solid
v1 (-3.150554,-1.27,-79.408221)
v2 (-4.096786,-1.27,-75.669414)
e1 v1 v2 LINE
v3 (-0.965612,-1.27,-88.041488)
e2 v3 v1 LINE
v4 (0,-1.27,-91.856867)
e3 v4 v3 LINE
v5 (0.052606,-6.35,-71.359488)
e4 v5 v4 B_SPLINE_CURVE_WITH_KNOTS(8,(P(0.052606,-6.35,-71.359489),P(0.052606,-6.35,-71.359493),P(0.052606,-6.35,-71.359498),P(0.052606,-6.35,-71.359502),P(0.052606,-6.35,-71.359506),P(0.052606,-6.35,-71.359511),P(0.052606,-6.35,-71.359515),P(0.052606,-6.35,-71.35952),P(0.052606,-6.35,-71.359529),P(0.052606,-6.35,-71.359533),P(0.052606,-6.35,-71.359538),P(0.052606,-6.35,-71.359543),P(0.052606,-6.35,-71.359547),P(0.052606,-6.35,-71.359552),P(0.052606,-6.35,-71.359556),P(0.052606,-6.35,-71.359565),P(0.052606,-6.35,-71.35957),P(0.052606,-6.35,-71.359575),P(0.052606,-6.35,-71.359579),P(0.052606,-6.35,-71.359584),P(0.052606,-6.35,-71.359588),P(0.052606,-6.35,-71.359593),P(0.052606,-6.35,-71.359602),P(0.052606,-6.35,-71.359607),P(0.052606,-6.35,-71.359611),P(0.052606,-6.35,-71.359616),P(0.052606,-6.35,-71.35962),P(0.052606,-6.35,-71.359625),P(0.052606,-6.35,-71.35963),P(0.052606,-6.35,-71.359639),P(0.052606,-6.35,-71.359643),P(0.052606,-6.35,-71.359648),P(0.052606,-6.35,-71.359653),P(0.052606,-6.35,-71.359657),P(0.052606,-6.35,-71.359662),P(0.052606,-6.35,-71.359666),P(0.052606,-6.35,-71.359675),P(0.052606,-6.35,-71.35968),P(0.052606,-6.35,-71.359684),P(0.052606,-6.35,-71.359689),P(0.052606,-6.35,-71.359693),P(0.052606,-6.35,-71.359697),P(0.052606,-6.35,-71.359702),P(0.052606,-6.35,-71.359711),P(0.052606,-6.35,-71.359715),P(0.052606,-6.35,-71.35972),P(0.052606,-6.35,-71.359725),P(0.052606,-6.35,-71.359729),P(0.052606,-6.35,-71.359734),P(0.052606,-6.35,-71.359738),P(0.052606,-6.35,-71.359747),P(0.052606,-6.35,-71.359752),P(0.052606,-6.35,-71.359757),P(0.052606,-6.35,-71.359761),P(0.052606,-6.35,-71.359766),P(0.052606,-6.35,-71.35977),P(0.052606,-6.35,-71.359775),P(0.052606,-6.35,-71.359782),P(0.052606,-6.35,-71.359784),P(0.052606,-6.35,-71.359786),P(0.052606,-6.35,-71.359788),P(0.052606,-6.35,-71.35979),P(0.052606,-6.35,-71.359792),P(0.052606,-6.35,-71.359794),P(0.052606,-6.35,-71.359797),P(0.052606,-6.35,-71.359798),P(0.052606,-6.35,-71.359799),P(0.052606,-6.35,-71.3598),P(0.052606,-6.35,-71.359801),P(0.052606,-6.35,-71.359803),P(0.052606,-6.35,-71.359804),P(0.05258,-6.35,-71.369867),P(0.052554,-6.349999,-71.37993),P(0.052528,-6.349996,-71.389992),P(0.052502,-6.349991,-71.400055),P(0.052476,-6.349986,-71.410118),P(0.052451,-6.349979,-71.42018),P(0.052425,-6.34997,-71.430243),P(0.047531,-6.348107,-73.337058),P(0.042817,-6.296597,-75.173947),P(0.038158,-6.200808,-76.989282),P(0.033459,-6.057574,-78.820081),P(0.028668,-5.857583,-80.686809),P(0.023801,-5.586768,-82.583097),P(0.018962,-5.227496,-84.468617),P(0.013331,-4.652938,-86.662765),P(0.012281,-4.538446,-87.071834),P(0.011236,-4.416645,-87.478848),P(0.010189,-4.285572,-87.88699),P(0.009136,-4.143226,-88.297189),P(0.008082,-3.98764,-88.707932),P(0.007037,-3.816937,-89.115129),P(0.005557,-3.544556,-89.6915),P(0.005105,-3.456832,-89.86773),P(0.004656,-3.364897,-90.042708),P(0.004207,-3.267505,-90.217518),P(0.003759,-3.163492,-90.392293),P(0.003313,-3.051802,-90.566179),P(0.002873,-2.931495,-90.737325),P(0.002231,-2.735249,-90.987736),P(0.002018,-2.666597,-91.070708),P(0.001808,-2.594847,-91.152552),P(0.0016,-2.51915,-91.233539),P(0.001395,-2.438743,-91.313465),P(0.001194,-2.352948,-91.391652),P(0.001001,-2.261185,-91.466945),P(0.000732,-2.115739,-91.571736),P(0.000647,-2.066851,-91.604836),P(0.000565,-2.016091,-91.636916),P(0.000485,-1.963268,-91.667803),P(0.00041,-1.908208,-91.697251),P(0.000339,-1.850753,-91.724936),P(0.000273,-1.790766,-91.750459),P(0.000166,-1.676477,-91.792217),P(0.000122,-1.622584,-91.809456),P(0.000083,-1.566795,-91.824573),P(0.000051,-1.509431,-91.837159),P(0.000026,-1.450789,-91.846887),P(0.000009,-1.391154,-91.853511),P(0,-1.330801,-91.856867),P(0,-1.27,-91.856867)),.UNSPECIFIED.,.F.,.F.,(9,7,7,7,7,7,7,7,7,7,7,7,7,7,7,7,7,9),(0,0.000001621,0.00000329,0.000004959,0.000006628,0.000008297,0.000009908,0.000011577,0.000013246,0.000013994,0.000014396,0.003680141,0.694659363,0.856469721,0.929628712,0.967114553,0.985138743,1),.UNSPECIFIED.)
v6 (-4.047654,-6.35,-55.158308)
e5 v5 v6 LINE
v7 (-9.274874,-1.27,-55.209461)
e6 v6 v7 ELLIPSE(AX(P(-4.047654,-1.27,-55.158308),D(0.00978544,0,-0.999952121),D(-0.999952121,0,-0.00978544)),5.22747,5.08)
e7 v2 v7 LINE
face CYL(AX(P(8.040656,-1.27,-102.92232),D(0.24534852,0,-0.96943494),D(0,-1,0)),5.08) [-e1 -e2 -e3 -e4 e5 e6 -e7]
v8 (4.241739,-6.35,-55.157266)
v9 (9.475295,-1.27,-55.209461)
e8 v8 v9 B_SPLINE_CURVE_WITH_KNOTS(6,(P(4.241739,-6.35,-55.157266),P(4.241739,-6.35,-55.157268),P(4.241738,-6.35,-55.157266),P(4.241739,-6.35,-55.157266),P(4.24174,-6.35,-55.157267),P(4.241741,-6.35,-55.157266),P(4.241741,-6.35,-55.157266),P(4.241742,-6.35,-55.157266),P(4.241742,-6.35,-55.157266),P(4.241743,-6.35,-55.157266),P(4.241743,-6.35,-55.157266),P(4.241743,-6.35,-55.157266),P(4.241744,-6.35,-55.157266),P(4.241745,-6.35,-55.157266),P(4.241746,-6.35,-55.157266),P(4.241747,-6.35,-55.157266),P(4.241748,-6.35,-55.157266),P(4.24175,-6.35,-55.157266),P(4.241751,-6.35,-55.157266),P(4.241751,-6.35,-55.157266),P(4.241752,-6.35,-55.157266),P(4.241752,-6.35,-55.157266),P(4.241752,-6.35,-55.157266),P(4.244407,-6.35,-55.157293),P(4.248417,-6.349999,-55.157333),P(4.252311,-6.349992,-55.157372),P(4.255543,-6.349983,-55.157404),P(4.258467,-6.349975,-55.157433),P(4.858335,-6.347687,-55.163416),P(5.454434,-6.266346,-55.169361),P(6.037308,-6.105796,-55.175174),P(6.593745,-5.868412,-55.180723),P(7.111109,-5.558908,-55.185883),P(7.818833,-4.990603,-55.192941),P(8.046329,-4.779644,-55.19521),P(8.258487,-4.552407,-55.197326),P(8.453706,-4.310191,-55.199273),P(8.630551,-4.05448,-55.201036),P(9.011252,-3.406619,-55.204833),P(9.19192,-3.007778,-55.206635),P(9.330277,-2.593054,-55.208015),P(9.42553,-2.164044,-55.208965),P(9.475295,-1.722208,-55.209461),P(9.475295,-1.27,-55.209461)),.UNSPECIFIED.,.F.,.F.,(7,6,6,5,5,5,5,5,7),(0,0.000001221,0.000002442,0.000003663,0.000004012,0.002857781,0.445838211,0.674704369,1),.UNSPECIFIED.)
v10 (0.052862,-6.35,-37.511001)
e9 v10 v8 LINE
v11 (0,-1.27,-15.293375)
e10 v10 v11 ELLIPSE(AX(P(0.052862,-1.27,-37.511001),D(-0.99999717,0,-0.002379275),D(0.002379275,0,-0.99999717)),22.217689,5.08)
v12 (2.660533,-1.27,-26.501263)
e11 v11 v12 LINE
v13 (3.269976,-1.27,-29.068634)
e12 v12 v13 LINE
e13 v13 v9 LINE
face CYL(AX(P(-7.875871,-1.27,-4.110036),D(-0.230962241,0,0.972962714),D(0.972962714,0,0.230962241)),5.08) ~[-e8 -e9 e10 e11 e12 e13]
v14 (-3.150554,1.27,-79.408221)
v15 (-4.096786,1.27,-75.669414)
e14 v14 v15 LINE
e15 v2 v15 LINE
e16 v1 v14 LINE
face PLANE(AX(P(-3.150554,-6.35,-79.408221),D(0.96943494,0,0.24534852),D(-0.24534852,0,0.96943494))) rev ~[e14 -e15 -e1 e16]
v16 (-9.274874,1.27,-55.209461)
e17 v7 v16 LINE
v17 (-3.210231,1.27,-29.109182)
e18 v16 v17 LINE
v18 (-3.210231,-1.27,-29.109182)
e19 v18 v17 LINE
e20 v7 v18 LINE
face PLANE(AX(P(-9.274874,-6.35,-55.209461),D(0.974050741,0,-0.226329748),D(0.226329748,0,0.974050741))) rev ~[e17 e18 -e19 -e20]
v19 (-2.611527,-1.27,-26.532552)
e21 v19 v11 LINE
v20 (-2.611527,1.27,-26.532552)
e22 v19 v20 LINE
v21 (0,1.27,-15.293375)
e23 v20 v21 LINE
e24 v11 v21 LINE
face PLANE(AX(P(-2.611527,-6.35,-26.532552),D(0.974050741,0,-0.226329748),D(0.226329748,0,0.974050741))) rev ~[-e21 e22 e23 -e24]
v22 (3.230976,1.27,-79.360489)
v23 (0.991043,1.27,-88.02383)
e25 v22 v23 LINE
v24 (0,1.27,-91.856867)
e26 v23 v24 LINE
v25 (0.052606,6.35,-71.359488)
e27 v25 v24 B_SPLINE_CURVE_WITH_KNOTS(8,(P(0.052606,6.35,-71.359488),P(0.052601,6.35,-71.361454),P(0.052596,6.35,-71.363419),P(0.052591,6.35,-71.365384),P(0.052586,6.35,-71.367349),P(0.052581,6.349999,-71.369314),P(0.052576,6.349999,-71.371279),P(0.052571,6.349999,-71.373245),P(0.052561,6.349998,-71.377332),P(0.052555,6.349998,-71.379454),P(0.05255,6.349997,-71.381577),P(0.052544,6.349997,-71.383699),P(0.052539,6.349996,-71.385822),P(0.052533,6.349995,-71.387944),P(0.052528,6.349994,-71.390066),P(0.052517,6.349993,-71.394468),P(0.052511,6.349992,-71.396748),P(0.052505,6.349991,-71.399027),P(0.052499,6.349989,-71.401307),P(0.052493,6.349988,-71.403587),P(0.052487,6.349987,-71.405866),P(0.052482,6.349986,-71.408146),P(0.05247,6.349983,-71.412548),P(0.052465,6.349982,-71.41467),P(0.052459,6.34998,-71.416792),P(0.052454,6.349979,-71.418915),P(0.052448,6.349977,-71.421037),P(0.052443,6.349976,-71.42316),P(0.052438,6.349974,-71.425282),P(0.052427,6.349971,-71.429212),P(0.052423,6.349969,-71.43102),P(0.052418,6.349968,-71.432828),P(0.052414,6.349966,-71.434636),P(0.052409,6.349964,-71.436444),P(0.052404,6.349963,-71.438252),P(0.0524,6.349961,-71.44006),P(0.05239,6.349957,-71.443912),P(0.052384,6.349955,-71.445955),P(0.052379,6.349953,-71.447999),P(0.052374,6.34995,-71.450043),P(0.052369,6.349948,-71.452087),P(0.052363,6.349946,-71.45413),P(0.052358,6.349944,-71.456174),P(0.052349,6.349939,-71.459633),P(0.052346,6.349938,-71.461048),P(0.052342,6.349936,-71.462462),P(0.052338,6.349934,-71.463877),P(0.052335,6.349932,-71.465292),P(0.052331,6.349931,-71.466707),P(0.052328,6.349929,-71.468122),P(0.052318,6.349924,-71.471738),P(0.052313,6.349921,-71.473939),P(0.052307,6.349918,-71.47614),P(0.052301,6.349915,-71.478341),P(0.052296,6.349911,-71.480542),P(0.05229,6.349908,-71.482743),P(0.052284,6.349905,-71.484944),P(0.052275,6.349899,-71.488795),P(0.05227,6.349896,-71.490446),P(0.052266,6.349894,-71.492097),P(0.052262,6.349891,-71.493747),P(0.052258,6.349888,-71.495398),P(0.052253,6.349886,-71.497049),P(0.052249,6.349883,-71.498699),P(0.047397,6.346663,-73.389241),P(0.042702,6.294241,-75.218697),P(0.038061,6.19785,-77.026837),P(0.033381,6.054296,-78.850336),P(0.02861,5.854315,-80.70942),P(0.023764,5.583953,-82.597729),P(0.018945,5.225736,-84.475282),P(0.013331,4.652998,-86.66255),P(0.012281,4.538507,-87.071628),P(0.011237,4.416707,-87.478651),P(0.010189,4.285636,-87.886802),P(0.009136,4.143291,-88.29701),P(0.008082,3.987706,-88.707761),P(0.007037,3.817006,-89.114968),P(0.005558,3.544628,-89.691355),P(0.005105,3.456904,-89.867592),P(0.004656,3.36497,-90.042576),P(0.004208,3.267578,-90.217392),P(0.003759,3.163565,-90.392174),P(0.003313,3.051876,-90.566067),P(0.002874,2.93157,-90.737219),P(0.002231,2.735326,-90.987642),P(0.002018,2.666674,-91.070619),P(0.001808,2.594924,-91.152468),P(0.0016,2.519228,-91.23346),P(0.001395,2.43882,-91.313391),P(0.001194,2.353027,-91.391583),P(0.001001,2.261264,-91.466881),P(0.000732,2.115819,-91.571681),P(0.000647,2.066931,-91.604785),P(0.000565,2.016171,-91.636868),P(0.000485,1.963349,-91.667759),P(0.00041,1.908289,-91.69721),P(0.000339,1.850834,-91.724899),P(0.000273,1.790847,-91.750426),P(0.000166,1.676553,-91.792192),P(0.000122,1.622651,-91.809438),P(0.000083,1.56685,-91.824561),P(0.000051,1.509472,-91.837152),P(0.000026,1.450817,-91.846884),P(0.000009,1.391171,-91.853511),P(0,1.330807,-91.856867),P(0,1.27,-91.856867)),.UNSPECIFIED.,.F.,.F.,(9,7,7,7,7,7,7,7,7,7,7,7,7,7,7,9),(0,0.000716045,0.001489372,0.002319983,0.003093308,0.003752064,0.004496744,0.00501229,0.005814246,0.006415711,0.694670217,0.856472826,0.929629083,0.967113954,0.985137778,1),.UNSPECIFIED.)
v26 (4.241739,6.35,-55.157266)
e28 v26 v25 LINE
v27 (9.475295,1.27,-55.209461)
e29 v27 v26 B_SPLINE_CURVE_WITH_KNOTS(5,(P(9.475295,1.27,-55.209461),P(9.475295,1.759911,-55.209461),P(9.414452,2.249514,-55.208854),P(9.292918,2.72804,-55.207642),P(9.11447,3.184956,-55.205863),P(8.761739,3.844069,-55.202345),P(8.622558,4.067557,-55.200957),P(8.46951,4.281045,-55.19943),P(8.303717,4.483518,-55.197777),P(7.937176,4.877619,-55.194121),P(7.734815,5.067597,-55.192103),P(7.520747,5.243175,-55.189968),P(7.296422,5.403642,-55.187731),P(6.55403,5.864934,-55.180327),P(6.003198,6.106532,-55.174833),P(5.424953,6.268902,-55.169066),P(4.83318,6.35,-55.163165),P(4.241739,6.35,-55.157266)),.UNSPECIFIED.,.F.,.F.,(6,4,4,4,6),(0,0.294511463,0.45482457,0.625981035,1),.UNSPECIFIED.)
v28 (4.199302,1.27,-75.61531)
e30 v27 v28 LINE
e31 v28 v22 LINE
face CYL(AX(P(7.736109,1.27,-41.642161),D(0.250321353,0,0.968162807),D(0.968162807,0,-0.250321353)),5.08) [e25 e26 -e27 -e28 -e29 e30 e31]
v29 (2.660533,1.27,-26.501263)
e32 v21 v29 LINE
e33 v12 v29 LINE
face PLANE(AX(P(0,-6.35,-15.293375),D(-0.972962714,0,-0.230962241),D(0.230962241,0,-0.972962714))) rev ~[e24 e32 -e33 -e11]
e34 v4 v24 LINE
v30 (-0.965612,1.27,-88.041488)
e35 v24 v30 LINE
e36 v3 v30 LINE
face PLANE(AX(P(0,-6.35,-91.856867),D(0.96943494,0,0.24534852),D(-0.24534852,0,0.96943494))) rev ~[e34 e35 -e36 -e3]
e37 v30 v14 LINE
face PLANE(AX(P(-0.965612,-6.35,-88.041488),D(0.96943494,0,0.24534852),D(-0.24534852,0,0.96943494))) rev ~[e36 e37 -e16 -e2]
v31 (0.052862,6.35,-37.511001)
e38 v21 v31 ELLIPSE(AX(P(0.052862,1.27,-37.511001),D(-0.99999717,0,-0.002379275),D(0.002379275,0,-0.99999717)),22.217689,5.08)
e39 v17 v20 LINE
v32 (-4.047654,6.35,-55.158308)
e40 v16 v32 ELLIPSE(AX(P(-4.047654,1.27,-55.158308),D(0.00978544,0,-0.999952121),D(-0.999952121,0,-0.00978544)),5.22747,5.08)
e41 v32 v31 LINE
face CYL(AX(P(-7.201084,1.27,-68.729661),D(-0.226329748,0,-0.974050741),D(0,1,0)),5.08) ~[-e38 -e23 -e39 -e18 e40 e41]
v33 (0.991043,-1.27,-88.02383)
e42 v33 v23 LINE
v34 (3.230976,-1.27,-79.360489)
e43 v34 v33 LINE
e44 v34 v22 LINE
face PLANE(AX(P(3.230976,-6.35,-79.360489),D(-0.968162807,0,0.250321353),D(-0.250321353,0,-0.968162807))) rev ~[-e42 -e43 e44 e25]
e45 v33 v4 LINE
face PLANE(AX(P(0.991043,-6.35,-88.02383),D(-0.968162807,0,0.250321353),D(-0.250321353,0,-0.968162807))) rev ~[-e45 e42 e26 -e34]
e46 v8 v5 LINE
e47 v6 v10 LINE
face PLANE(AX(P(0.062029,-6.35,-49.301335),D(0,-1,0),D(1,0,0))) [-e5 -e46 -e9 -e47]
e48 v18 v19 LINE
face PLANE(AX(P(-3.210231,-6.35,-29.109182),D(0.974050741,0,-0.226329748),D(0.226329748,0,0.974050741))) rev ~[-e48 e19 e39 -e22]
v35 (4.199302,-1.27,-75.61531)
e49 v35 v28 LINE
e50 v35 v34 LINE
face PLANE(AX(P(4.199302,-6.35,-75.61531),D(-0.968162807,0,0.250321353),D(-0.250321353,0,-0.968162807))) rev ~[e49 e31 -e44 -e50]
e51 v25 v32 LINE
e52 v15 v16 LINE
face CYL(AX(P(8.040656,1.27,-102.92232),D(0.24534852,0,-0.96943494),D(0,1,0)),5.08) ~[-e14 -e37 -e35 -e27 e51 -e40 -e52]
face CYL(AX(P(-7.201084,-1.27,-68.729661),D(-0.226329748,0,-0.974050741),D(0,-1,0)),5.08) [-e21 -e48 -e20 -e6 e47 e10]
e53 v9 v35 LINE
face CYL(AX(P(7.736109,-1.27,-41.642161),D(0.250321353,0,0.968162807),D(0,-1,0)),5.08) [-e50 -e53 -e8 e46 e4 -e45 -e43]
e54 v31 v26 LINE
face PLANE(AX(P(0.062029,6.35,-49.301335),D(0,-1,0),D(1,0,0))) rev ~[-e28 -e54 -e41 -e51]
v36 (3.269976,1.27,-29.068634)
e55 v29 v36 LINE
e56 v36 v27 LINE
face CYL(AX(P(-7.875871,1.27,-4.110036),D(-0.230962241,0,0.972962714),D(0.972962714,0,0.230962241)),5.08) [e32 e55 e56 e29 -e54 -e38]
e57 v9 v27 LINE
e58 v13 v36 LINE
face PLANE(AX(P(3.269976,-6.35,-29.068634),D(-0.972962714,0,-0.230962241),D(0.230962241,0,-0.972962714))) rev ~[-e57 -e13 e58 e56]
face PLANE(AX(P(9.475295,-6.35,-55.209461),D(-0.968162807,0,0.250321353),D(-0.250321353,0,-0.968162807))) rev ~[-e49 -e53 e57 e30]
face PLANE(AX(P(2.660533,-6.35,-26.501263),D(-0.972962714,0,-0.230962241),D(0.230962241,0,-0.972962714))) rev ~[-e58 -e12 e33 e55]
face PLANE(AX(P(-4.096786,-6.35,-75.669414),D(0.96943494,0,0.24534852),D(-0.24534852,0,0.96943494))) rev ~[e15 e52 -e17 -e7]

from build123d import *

# Parameters (mm, degrees)
F1_DEPTH    = 6.35
F2_DEPTH    = 6.35
F4_DEPTH    = 25.4
F5_T1_DEPTH = 66.3794734437
F5_T3_DEPTH = 66.4252991911
F5_T5_DEPTH = 63.2525240866
F5_T7_DEPTH = 63.2028524021


# Not quite as in the source:
# - a fillet or chamfer that OpenCascade refuses, or shapes differently, is made with other operations: its cross-section is extruded or revolved along the edge and cut away or added


with BuildPart() as f1:
    # F0 (on Front) → F1 (new body)
    with BuildSketch(Plane.XZ):
        Polygon((10.5009634349, -8.6313571018), (0, -8.4001217037), (-10.5245159939, -8.168367669), (-8.3013391122, -91.856867075), (8.6683045514, -91.856867075), align=None)
    extrude(amount=F1_DEPTH)

    # F2 (add): a face of the model
    f2_faces = [f1.faces().sort_by_distance(p)[0] for p in [
        (0.0745348421, 0, -48.6438367355),
    ]]
    extrude(f2_faces, amount=F2_DEPTH)

    # F3 (on face) → F4 (cut)
    with BuildSketch(Plane.XZ.offset(6.35)):
        Polygon((7.741477061, -8.5705921125), (0, -12.6956291497), (-8.4089043082, -8.2149542811), (-10.5245159939, -8.168367669), (-10.4707083295, -10.1938847244), (0, -15.2933746576), (10.4665109394, -10.1959289555), (10.5009634349, -8.6313571018), align=None)
        Polygon((-8.4089043082, -8.2149542811), (0, -12.6956291497), (7.741477061, -8.5705921125), align=None)
        Polygon((0, -15.2933746576), (-10.4707083295, -10.1938847244), (-10.1647846318, -21.7099702861), (-2.6734457948, -26.4930181658), (-2.660532576, -26.5012629595), (-2.6115273083, -26.532551698), align=None)
        Polygon((10.2136542458, -21.6787681594), (10.4665109394, -10.1959289555), (0, -15.2933746576), (2.660532576, -26.5012629595), align=None)
        Polygon((-2.6734457948, -26.4930181658), (-10.1647846318, -21.7099702861), (-10.0923027152, -24.4384544155), (-3.4606218927, -28.9392464633), (-3.2699760565, -29.068634063), (-3.2102312503, -29.1091816943), (-2.6115273083, -26.532551698), (-2.660532576, -26.5012629595), align=None)
        Polygon((10.15380398, -24.3967147102), (10.2136542458, -21.6787681594), (2.660532576, -26.5012629595), (3.2699760565, -29.068634063), align=None)
        Polygon((-3.4606218927, -28.9392464633), (-10.0923027152, -24.4384544155), (-9.2748739024, -55.2094611118), (-3.2102312503, -29.1091816943), (-3.2699760565, -29.068634063), align=None)
        Polygon((9.4752950296, -55.2094611118), (10.15380398, -24.3967147102), (3.2699760565, -29.068634063), align=None)
        Polygon((-4.0967862529, -75.6694136894), (-9.2748739024, -55.2094611118), (-8.7972565245, -73.1887240187), (-4.2695118804, -75.5782571337), (-4.199302435, -75.6153104147), align=None)
        Polygon((9.0827017549, -73.0380792973), (9.4752950296, -55.2094611118), (4.199302435, -75.6153104147), align=None)
        Polygon((-3.1505538377, -79.4082206875), (-4.0967862529, -75.6694136894), (-4.199302435, -75.6153104147), (-4.2695118804, -75.5782571337), (-8.7972565245, -73.1887240187), (-8.7198462703, -76.1027287805), (-3.3105833326, -79.3132398248), (-3.2309755221, -79.3604887305), align=None)
        Polygon((9.0827017549, -73.0380792973), (4.199302435, -75.6153104147), (3.2309755221, -79.3604887305), (9.0191284413, -75.9250985328), align=None)
        Polygon((-0.965611629, -88.0414878319), (-3.1505538377, -79.4082206875), (-3.2309755221, -79.3604887305), (-3.3105833326, -79.3132398248), (-8.7198462703, -76.1027287805), (-8.5424459568, -82.7807246478), (-1.0061214638, -88.0133609601), (-0.9910429813, -88.023830283), align=None)
        Polygon((9.0191284413, -75.9250985328), (3.2309755221, -79.3604887305), (0.9910429813, -88.023830283), (8.8732221424, -82.5510594467), align=None)
        Polygon((0, -91.856867075), (-0.965611629, -88.0414878319), (-0.9910429813, -88.023830283), (-1.0061214638, -88.0133609601), (-8.5424459568, -82.7807246478), (-8.434321605, -86.8509202434), align=None)
        Polygon((8.8732221424, -82.5510594467), (0.9910429813, -88.023830283), (0, -91.856867075), (8.7830958233, -86.6439154273), align=None)
        Polygon((-8.3013391122, -91.856867075), (0, -91.856867075), (-8.434321605, -86.8509202434), align=None)
        Polygon((8.7830958233, -86.6439154273), (0, -91.856867075), (8.6683045514, -91.856867075), align=None)
    extrude(amount=-F4_DEPTH, mode=Mode.SUBTRACT)

    # F5: fillet of radius 5.08 on 8 edges, made by hand

    # F5_s2 → F5_t1 (cut)
    with BuildSketch(Plane(origin=(-15.5207879816, 0, -66.796500031), x_dir=(0, 1, 0), z_dir=(0.2263297481, 0, 0.9740507405))):
        with BuildLine():
            ThreePointArc((-6.35, -8.5413456341), (-4.8621024484, -4.9492431857), (-1.27, -3.4613456341))
            Line((-1.27, -3.4613456341), (-6.35, -3.4613456341))
            Line((-6.35, -3.4613456341), (-6.35, -8.5413456341))
        make_face()
        with BuildLine():
            ThreePointArc((6.35, -8.5413456341), (4.8621024484, -4.9492431857), (1.27, -3.4613456341))
            Line((1.27, -3.4613456341), (6.35, -3.4613456341))
            Line((6.35, -3.4613456341), (6.35, -8.5413456341))
        make_face()
    extrude(amount=F5_T1_DEPTH, mode=Mode.SUBTRACT)

    # F5_s4 → F5_t3 (cut)
    with BuildSketch(Plane(origin=(0.5034707355, 0, -2.1209451889), x_dir=(0, 1, 0), z_dir=(0.2309622408, 0, -0.9729627143))):
        with BuildLine():
            ThreePointArc((-1.27, -3.5321920799), (-4.8621024484, -5.0200896315), (-6.35, -8.6121920799))
            Line((-6.35, -8.6121920799), (-6.35, -3.5321920799))
            Line((-6.35, -3.5321920799), (-1.27, -3.5321920799))
        make_face()
        with BuildLine():
            ThreePointArc((1.27, -3.5321920799), (4.8621024484, -5.0200896315), (6.35, -8.6121920799))
            Line((6.35, -8.6121920799), (6.35, -3.5321920799))
            Line((6.35, -3.5321920799), (1.27, -3.5321920799))
        make_face()
    extrude(amount=F5_T3_DEPTH, mode=Mode.SUBTRACT)

    # F5_s6 → F5_t5 (cut)
    with BuildSketch(Plane(origin=(-9.6073030151, 0, -37.1579705651), x_dir=(0, 1, 0), z_dir=(-0.2503213526, 0, -0.9681628068))):
        with BuildLine():
            ThreePointArc((-6.35, 17.9137352141), (-4.8621024484, 21.5058376626), (-1.27, 22.9937352141))
            Line((-1.27, 22.9937352141), (-6.35, 22.9937352141))
            Line((-6.35, 22.9937352141), (-6.35, 17.9137352141))
        make_face()
        with BuildLine():
            ThreePointArc((1.27, 22.9937352141), (4.8621024484, 21.5058376626), (6.35, 17.9137352141))
            Line((6.35, 17.9137352141), (6.35, 22.9937352141))
            Line((6.35, 22.9937352141), (1.27, 22.9937352141))
        make_face()
    extrude(amount=F5_T5_DEPTH, mode=Mode.SUBTRACT)

    # F5_s8 → F5_t7 (cut)
    with BuildSketch(Plane(origin=(24.9640295189, 0, -98.6392843591), x_dir=(0, 1, 0), z_dir=(-0.2453485204, 0, 0.9694349403))):
        with BuildLine():
            ThreePointArc((-6.35, 17.4569464222), (-4.8621024484, 21.0490488706), (-1.27, 22.5369464222))
            Line((-1.27, 22.5369464222), (-6.35, 22.5369464222))
            Line((-6.35, 22.5369464222), (-6.35, 17.4569464222))
        make_face()
        with BuildLine():
            ThreePointArc((6.35, 17.4569464222), (4.8621024484, 21.0490488706), (1.27, 22.5369464222))
            Line((1.27, 22.5369464222), (6.35, 22.5369464222))
            Line((6.35, 22.5369464222), (6.35, 17.4569464222))
        make_face()
    extrude(amount=F5_T7_DEPTH, mode=Mode.SUBTRACT)


solid = f1.part
